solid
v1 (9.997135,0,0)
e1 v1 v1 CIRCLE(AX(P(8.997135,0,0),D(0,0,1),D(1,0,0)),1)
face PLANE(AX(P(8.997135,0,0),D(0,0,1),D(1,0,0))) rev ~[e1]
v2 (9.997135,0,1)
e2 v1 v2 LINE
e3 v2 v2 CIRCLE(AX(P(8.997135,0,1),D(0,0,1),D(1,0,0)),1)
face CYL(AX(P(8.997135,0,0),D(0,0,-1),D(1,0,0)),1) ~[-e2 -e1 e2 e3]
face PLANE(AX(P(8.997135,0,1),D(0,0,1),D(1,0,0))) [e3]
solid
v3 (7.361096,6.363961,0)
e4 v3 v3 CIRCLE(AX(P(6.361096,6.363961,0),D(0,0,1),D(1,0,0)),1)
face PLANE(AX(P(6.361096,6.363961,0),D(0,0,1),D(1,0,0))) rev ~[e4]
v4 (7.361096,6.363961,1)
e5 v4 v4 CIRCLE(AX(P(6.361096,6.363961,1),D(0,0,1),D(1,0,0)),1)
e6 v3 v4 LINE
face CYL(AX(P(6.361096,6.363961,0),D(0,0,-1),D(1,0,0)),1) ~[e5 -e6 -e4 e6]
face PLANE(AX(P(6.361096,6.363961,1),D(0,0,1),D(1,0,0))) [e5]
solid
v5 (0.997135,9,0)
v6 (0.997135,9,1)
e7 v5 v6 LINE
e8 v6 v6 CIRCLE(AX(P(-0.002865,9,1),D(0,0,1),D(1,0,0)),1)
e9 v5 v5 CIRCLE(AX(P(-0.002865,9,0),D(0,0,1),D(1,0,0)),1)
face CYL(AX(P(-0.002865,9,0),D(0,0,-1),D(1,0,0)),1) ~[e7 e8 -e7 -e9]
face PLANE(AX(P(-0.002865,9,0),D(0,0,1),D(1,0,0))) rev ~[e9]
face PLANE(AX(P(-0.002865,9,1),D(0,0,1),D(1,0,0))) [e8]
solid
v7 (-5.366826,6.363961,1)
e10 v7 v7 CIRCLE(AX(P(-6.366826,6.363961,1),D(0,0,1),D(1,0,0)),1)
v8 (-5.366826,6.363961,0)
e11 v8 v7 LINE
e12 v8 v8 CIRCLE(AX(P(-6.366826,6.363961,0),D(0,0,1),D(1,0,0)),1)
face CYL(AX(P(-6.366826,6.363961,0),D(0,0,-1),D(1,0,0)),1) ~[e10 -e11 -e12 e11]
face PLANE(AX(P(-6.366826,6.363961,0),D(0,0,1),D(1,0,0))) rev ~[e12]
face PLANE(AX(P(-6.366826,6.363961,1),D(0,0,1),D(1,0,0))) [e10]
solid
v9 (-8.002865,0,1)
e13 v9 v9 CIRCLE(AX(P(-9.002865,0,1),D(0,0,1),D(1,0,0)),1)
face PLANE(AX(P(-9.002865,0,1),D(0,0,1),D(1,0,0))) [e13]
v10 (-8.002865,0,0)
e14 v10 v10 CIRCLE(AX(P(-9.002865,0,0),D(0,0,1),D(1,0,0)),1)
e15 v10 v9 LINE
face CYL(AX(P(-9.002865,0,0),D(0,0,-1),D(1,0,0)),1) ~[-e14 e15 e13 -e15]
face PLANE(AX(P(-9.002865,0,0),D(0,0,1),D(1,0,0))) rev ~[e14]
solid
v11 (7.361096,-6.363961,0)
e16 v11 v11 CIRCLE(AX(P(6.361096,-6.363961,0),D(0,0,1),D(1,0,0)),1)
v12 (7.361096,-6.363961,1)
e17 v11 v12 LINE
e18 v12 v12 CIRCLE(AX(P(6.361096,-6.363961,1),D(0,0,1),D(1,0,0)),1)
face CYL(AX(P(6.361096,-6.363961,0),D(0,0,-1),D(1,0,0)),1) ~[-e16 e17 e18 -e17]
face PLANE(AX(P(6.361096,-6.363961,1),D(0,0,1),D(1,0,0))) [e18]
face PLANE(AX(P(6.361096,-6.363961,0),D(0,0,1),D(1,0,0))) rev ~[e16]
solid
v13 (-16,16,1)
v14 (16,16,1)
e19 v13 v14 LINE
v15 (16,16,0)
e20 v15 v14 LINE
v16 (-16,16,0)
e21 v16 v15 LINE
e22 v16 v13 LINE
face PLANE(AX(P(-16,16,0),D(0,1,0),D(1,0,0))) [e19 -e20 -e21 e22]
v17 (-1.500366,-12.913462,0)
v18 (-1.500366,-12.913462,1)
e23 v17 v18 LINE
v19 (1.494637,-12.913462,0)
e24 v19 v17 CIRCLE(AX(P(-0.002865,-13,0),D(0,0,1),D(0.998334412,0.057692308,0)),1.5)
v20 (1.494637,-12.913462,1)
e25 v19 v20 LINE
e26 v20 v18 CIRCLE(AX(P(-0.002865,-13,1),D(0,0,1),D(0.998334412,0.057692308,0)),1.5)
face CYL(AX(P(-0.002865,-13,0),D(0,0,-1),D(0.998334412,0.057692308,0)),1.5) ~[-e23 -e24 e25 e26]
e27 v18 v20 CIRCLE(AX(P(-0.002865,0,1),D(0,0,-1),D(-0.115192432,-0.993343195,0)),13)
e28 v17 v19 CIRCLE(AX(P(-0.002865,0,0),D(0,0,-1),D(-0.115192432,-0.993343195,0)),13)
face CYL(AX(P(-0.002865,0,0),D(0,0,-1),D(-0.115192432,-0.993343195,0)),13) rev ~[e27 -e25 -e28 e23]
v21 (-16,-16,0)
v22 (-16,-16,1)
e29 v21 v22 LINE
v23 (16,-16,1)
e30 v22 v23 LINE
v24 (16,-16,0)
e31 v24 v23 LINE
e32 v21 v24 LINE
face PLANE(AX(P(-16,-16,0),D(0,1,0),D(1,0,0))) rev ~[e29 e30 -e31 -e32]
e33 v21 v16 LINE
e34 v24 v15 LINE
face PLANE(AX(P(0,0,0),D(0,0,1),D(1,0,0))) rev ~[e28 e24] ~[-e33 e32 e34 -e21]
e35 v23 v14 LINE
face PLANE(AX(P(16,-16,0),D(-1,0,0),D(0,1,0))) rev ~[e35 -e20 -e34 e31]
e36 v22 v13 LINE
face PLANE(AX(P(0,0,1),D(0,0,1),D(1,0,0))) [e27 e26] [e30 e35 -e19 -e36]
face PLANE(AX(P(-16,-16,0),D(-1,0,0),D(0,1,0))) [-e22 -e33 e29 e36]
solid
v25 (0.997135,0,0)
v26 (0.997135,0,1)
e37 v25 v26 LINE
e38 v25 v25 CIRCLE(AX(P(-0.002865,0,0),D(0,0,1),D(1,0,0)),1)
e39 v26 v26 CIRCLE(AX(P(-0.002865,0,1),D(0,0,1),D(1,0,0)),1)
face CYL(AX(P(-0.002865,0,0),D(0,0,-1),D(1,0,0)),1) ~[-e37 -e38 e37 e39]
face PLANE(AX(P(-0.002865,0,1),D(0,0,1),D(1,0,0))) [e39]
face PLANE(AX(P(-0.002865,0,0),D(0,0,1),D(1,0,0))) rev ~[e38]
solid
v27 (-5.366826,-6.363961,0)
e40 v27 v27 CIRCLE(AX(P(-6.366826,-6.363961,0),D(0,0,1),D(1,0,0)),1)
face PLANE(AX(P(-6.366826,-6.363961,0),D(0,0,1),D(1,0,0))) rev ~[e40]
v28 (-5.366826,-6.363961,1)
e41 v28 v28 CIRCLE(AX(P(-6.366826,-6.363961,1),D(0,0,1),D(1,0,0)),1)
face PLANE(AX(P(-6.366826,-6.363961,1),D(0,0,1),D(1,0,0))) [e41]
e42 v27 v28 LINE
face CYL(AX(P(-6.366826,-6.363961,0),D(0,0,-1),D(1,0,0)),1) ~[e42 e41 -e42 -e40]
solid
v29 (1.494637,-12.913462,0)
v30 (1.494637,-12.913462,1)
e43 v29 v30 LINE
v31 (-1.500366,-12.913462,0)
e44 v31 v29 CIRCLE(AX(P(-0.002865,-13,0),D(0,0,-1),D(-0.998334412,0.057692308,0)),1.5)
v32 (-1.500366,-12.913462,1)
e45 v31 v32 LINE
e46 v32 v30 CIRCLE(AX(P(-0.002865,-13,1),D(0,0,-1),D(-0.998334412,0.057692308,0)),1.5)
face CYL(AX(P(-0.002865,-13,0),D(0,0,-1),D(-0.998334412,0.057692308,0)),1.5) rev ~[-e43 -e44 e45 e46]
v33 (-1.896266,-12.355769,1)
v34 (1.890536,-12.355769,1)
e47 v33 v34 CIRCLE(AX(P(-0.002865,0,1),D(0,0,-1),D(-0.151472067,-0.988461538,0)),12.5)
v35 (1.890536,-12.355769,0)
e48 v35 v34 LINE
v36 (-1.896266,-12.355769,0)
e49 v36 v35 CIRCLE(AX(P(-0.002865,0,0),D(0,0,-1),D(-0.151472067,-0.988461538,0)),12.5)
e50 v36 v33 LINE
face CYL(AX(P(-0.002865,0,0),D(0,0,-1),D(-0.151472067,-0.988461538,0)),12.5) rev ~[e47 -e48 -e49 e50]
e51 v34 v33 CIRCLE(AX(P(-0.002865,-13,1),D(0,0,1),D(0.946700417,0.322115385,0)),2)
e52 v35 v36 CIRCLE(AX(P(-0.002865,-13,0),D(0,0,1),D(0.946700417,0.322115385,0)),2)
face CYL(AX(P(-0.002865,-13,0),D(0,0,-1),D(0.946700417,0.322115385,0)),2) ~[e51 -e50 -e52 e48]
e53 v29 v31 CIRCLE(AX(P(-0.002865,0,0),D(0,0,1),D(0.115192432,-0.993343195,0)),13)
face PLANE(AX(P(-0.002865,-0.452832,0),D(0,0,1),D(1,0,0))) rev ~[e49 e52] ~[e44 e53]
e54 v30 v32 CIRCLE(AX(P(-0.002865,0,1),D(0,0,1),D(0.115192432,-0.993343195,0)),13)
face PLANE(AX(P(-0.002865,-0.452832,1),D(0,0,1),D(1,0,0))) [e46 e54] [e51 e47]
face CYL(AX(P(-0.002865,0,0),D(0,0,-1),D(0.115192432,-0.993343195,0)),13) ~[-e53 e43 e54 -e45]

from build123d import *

# Parameters (mm, degrees)
F1_DEPTH = 1
F0_R     = 1
F0_W     = 32
F0_H     = 32
F2_DEPTH = 1


# Not quite as in the source:
# - a feature names something its author has since deleted; it is built from what else it names


with BuildPart() as f1:
    # F0 (on Top) → F1 (new body)
    with BuildSketch(Plane.XY):
        with BuildLine():
            ThreePointArc((-1.5003664489, -12.9134615385), (-0.0028648313, -11.5), (1.4946367862, -12.9134615385))
            ThreePointArc((1.4946367862, -12.9134615385), (-0.0028648313, 13), (-1.5003664489, -12.9134615385))
        make_face()
        with BuildLine():
            ThreePointArc((-1.8962656648, -12.3557692308), (-0.0028648313, 12.5), (1.8905360021, -12.3557692308))
            ThreePointArc((1.8905360021, -12.3557692308), (-0.0028648313, -11), (-1.8962656648, -12.3557692308))
        make_face(mode=Mode.SUBTRACT)
    extrude(amount=F1_DEPTH)


with BuildPart() as f1b:
    # F0 (on Top) → F1, piece 2 (new body)
    with BuildSketch(Plane.XY):
        with Locations((-6.366825862, -6.3639610307)):
            Circle(F0_R)
    extrude(amount=F1_DEPTH)


with BuildPart() as f1c:
    # F0 (on Top) → F1, piece 3 (new body)
    with BuildSketch(Plane.XY):
        with Locations((-9.0028648313, 0)):
            Circle(F0_R)
    extrude(amount=F1_DEPTH)


with BuildPart() as f1d:
    # F0 (on Top) → F1, piece 4 (new body)
    with BuildSketch(Plane.XY):
        with Locations((-6.366825862, 6.3639610307)):
            Circle(F0_R)
    extrude(amount=F1_DEPTH)


with BuildPart() as f1e:
    # F0 (on Top) → F1, piece 5 (new body)
    with BuildSketch(Plane.XY):
        with Locations((-0.0028648313, 9)):
            Circle(F0_R)
    extrude(amount=F1_DEPTH)


with BuildPart() as f1f:
    # F0 (on Top) → F1, piece 6 (new body)
    with BuildSketch(Plane.XY):
        with Locations((6.3610961993, 6.3639610307)):
            Circle(F0_R)
    extrude(amount=F1_DEPTH)


with BuildPart() as f1g:
    # F0 (on Top) → F1, piece 7 (new body)
    with BuildSketch(Plane.XY):
        with Locations((8.9971351687, 0)):
            Circle(F0_R)
    extrude(amount=F1_DEPTH)


with BuildPart() as f1h:
    # F0 (on Top) → F1, piece 8 (new body)
    with BuildSketch(Plane.XY):
        with Locations((6.3610961993, -6.3639610307)):
            Circle(F0_R)
    extrude(amount=F1_DEPTH)


with BuildPart() as f1i:
    # F0 (on Top) → F1, piece 9 (new body)
    with BuildSketch(Plane.XY):
        with Locations((-0.0028648313, 0)):
            Circle(F0_R)
    extrude(amount=F1_DEPTH)


with BuildPart() as f2:
    # F0 (on Top) → F2 (new body)
    with BuildSketch(Plane.XY):
        Rectangle(F0_W, F0_H)
        with BuildLine():
            ThreePointArc((-1.5003664489, -12.9134615385), (-0.0028648313, 13), (1.4946367862, -12.9134615385))
            ThreePointArc((1.4946367862, -12.9134615385), (-0.0028648313, -11.5), (-1.5003664489, -12.9134615385))
        make_face(mode=Mode.SUBTRACT)
    extrude(amount=F2_DEPTH)


solid = Compound([f1.part, f1b.part, f1c.part, f1d.part, f1e.part, f1f.part, f1g.part, f1h.part, f1i.part, f2.part])
